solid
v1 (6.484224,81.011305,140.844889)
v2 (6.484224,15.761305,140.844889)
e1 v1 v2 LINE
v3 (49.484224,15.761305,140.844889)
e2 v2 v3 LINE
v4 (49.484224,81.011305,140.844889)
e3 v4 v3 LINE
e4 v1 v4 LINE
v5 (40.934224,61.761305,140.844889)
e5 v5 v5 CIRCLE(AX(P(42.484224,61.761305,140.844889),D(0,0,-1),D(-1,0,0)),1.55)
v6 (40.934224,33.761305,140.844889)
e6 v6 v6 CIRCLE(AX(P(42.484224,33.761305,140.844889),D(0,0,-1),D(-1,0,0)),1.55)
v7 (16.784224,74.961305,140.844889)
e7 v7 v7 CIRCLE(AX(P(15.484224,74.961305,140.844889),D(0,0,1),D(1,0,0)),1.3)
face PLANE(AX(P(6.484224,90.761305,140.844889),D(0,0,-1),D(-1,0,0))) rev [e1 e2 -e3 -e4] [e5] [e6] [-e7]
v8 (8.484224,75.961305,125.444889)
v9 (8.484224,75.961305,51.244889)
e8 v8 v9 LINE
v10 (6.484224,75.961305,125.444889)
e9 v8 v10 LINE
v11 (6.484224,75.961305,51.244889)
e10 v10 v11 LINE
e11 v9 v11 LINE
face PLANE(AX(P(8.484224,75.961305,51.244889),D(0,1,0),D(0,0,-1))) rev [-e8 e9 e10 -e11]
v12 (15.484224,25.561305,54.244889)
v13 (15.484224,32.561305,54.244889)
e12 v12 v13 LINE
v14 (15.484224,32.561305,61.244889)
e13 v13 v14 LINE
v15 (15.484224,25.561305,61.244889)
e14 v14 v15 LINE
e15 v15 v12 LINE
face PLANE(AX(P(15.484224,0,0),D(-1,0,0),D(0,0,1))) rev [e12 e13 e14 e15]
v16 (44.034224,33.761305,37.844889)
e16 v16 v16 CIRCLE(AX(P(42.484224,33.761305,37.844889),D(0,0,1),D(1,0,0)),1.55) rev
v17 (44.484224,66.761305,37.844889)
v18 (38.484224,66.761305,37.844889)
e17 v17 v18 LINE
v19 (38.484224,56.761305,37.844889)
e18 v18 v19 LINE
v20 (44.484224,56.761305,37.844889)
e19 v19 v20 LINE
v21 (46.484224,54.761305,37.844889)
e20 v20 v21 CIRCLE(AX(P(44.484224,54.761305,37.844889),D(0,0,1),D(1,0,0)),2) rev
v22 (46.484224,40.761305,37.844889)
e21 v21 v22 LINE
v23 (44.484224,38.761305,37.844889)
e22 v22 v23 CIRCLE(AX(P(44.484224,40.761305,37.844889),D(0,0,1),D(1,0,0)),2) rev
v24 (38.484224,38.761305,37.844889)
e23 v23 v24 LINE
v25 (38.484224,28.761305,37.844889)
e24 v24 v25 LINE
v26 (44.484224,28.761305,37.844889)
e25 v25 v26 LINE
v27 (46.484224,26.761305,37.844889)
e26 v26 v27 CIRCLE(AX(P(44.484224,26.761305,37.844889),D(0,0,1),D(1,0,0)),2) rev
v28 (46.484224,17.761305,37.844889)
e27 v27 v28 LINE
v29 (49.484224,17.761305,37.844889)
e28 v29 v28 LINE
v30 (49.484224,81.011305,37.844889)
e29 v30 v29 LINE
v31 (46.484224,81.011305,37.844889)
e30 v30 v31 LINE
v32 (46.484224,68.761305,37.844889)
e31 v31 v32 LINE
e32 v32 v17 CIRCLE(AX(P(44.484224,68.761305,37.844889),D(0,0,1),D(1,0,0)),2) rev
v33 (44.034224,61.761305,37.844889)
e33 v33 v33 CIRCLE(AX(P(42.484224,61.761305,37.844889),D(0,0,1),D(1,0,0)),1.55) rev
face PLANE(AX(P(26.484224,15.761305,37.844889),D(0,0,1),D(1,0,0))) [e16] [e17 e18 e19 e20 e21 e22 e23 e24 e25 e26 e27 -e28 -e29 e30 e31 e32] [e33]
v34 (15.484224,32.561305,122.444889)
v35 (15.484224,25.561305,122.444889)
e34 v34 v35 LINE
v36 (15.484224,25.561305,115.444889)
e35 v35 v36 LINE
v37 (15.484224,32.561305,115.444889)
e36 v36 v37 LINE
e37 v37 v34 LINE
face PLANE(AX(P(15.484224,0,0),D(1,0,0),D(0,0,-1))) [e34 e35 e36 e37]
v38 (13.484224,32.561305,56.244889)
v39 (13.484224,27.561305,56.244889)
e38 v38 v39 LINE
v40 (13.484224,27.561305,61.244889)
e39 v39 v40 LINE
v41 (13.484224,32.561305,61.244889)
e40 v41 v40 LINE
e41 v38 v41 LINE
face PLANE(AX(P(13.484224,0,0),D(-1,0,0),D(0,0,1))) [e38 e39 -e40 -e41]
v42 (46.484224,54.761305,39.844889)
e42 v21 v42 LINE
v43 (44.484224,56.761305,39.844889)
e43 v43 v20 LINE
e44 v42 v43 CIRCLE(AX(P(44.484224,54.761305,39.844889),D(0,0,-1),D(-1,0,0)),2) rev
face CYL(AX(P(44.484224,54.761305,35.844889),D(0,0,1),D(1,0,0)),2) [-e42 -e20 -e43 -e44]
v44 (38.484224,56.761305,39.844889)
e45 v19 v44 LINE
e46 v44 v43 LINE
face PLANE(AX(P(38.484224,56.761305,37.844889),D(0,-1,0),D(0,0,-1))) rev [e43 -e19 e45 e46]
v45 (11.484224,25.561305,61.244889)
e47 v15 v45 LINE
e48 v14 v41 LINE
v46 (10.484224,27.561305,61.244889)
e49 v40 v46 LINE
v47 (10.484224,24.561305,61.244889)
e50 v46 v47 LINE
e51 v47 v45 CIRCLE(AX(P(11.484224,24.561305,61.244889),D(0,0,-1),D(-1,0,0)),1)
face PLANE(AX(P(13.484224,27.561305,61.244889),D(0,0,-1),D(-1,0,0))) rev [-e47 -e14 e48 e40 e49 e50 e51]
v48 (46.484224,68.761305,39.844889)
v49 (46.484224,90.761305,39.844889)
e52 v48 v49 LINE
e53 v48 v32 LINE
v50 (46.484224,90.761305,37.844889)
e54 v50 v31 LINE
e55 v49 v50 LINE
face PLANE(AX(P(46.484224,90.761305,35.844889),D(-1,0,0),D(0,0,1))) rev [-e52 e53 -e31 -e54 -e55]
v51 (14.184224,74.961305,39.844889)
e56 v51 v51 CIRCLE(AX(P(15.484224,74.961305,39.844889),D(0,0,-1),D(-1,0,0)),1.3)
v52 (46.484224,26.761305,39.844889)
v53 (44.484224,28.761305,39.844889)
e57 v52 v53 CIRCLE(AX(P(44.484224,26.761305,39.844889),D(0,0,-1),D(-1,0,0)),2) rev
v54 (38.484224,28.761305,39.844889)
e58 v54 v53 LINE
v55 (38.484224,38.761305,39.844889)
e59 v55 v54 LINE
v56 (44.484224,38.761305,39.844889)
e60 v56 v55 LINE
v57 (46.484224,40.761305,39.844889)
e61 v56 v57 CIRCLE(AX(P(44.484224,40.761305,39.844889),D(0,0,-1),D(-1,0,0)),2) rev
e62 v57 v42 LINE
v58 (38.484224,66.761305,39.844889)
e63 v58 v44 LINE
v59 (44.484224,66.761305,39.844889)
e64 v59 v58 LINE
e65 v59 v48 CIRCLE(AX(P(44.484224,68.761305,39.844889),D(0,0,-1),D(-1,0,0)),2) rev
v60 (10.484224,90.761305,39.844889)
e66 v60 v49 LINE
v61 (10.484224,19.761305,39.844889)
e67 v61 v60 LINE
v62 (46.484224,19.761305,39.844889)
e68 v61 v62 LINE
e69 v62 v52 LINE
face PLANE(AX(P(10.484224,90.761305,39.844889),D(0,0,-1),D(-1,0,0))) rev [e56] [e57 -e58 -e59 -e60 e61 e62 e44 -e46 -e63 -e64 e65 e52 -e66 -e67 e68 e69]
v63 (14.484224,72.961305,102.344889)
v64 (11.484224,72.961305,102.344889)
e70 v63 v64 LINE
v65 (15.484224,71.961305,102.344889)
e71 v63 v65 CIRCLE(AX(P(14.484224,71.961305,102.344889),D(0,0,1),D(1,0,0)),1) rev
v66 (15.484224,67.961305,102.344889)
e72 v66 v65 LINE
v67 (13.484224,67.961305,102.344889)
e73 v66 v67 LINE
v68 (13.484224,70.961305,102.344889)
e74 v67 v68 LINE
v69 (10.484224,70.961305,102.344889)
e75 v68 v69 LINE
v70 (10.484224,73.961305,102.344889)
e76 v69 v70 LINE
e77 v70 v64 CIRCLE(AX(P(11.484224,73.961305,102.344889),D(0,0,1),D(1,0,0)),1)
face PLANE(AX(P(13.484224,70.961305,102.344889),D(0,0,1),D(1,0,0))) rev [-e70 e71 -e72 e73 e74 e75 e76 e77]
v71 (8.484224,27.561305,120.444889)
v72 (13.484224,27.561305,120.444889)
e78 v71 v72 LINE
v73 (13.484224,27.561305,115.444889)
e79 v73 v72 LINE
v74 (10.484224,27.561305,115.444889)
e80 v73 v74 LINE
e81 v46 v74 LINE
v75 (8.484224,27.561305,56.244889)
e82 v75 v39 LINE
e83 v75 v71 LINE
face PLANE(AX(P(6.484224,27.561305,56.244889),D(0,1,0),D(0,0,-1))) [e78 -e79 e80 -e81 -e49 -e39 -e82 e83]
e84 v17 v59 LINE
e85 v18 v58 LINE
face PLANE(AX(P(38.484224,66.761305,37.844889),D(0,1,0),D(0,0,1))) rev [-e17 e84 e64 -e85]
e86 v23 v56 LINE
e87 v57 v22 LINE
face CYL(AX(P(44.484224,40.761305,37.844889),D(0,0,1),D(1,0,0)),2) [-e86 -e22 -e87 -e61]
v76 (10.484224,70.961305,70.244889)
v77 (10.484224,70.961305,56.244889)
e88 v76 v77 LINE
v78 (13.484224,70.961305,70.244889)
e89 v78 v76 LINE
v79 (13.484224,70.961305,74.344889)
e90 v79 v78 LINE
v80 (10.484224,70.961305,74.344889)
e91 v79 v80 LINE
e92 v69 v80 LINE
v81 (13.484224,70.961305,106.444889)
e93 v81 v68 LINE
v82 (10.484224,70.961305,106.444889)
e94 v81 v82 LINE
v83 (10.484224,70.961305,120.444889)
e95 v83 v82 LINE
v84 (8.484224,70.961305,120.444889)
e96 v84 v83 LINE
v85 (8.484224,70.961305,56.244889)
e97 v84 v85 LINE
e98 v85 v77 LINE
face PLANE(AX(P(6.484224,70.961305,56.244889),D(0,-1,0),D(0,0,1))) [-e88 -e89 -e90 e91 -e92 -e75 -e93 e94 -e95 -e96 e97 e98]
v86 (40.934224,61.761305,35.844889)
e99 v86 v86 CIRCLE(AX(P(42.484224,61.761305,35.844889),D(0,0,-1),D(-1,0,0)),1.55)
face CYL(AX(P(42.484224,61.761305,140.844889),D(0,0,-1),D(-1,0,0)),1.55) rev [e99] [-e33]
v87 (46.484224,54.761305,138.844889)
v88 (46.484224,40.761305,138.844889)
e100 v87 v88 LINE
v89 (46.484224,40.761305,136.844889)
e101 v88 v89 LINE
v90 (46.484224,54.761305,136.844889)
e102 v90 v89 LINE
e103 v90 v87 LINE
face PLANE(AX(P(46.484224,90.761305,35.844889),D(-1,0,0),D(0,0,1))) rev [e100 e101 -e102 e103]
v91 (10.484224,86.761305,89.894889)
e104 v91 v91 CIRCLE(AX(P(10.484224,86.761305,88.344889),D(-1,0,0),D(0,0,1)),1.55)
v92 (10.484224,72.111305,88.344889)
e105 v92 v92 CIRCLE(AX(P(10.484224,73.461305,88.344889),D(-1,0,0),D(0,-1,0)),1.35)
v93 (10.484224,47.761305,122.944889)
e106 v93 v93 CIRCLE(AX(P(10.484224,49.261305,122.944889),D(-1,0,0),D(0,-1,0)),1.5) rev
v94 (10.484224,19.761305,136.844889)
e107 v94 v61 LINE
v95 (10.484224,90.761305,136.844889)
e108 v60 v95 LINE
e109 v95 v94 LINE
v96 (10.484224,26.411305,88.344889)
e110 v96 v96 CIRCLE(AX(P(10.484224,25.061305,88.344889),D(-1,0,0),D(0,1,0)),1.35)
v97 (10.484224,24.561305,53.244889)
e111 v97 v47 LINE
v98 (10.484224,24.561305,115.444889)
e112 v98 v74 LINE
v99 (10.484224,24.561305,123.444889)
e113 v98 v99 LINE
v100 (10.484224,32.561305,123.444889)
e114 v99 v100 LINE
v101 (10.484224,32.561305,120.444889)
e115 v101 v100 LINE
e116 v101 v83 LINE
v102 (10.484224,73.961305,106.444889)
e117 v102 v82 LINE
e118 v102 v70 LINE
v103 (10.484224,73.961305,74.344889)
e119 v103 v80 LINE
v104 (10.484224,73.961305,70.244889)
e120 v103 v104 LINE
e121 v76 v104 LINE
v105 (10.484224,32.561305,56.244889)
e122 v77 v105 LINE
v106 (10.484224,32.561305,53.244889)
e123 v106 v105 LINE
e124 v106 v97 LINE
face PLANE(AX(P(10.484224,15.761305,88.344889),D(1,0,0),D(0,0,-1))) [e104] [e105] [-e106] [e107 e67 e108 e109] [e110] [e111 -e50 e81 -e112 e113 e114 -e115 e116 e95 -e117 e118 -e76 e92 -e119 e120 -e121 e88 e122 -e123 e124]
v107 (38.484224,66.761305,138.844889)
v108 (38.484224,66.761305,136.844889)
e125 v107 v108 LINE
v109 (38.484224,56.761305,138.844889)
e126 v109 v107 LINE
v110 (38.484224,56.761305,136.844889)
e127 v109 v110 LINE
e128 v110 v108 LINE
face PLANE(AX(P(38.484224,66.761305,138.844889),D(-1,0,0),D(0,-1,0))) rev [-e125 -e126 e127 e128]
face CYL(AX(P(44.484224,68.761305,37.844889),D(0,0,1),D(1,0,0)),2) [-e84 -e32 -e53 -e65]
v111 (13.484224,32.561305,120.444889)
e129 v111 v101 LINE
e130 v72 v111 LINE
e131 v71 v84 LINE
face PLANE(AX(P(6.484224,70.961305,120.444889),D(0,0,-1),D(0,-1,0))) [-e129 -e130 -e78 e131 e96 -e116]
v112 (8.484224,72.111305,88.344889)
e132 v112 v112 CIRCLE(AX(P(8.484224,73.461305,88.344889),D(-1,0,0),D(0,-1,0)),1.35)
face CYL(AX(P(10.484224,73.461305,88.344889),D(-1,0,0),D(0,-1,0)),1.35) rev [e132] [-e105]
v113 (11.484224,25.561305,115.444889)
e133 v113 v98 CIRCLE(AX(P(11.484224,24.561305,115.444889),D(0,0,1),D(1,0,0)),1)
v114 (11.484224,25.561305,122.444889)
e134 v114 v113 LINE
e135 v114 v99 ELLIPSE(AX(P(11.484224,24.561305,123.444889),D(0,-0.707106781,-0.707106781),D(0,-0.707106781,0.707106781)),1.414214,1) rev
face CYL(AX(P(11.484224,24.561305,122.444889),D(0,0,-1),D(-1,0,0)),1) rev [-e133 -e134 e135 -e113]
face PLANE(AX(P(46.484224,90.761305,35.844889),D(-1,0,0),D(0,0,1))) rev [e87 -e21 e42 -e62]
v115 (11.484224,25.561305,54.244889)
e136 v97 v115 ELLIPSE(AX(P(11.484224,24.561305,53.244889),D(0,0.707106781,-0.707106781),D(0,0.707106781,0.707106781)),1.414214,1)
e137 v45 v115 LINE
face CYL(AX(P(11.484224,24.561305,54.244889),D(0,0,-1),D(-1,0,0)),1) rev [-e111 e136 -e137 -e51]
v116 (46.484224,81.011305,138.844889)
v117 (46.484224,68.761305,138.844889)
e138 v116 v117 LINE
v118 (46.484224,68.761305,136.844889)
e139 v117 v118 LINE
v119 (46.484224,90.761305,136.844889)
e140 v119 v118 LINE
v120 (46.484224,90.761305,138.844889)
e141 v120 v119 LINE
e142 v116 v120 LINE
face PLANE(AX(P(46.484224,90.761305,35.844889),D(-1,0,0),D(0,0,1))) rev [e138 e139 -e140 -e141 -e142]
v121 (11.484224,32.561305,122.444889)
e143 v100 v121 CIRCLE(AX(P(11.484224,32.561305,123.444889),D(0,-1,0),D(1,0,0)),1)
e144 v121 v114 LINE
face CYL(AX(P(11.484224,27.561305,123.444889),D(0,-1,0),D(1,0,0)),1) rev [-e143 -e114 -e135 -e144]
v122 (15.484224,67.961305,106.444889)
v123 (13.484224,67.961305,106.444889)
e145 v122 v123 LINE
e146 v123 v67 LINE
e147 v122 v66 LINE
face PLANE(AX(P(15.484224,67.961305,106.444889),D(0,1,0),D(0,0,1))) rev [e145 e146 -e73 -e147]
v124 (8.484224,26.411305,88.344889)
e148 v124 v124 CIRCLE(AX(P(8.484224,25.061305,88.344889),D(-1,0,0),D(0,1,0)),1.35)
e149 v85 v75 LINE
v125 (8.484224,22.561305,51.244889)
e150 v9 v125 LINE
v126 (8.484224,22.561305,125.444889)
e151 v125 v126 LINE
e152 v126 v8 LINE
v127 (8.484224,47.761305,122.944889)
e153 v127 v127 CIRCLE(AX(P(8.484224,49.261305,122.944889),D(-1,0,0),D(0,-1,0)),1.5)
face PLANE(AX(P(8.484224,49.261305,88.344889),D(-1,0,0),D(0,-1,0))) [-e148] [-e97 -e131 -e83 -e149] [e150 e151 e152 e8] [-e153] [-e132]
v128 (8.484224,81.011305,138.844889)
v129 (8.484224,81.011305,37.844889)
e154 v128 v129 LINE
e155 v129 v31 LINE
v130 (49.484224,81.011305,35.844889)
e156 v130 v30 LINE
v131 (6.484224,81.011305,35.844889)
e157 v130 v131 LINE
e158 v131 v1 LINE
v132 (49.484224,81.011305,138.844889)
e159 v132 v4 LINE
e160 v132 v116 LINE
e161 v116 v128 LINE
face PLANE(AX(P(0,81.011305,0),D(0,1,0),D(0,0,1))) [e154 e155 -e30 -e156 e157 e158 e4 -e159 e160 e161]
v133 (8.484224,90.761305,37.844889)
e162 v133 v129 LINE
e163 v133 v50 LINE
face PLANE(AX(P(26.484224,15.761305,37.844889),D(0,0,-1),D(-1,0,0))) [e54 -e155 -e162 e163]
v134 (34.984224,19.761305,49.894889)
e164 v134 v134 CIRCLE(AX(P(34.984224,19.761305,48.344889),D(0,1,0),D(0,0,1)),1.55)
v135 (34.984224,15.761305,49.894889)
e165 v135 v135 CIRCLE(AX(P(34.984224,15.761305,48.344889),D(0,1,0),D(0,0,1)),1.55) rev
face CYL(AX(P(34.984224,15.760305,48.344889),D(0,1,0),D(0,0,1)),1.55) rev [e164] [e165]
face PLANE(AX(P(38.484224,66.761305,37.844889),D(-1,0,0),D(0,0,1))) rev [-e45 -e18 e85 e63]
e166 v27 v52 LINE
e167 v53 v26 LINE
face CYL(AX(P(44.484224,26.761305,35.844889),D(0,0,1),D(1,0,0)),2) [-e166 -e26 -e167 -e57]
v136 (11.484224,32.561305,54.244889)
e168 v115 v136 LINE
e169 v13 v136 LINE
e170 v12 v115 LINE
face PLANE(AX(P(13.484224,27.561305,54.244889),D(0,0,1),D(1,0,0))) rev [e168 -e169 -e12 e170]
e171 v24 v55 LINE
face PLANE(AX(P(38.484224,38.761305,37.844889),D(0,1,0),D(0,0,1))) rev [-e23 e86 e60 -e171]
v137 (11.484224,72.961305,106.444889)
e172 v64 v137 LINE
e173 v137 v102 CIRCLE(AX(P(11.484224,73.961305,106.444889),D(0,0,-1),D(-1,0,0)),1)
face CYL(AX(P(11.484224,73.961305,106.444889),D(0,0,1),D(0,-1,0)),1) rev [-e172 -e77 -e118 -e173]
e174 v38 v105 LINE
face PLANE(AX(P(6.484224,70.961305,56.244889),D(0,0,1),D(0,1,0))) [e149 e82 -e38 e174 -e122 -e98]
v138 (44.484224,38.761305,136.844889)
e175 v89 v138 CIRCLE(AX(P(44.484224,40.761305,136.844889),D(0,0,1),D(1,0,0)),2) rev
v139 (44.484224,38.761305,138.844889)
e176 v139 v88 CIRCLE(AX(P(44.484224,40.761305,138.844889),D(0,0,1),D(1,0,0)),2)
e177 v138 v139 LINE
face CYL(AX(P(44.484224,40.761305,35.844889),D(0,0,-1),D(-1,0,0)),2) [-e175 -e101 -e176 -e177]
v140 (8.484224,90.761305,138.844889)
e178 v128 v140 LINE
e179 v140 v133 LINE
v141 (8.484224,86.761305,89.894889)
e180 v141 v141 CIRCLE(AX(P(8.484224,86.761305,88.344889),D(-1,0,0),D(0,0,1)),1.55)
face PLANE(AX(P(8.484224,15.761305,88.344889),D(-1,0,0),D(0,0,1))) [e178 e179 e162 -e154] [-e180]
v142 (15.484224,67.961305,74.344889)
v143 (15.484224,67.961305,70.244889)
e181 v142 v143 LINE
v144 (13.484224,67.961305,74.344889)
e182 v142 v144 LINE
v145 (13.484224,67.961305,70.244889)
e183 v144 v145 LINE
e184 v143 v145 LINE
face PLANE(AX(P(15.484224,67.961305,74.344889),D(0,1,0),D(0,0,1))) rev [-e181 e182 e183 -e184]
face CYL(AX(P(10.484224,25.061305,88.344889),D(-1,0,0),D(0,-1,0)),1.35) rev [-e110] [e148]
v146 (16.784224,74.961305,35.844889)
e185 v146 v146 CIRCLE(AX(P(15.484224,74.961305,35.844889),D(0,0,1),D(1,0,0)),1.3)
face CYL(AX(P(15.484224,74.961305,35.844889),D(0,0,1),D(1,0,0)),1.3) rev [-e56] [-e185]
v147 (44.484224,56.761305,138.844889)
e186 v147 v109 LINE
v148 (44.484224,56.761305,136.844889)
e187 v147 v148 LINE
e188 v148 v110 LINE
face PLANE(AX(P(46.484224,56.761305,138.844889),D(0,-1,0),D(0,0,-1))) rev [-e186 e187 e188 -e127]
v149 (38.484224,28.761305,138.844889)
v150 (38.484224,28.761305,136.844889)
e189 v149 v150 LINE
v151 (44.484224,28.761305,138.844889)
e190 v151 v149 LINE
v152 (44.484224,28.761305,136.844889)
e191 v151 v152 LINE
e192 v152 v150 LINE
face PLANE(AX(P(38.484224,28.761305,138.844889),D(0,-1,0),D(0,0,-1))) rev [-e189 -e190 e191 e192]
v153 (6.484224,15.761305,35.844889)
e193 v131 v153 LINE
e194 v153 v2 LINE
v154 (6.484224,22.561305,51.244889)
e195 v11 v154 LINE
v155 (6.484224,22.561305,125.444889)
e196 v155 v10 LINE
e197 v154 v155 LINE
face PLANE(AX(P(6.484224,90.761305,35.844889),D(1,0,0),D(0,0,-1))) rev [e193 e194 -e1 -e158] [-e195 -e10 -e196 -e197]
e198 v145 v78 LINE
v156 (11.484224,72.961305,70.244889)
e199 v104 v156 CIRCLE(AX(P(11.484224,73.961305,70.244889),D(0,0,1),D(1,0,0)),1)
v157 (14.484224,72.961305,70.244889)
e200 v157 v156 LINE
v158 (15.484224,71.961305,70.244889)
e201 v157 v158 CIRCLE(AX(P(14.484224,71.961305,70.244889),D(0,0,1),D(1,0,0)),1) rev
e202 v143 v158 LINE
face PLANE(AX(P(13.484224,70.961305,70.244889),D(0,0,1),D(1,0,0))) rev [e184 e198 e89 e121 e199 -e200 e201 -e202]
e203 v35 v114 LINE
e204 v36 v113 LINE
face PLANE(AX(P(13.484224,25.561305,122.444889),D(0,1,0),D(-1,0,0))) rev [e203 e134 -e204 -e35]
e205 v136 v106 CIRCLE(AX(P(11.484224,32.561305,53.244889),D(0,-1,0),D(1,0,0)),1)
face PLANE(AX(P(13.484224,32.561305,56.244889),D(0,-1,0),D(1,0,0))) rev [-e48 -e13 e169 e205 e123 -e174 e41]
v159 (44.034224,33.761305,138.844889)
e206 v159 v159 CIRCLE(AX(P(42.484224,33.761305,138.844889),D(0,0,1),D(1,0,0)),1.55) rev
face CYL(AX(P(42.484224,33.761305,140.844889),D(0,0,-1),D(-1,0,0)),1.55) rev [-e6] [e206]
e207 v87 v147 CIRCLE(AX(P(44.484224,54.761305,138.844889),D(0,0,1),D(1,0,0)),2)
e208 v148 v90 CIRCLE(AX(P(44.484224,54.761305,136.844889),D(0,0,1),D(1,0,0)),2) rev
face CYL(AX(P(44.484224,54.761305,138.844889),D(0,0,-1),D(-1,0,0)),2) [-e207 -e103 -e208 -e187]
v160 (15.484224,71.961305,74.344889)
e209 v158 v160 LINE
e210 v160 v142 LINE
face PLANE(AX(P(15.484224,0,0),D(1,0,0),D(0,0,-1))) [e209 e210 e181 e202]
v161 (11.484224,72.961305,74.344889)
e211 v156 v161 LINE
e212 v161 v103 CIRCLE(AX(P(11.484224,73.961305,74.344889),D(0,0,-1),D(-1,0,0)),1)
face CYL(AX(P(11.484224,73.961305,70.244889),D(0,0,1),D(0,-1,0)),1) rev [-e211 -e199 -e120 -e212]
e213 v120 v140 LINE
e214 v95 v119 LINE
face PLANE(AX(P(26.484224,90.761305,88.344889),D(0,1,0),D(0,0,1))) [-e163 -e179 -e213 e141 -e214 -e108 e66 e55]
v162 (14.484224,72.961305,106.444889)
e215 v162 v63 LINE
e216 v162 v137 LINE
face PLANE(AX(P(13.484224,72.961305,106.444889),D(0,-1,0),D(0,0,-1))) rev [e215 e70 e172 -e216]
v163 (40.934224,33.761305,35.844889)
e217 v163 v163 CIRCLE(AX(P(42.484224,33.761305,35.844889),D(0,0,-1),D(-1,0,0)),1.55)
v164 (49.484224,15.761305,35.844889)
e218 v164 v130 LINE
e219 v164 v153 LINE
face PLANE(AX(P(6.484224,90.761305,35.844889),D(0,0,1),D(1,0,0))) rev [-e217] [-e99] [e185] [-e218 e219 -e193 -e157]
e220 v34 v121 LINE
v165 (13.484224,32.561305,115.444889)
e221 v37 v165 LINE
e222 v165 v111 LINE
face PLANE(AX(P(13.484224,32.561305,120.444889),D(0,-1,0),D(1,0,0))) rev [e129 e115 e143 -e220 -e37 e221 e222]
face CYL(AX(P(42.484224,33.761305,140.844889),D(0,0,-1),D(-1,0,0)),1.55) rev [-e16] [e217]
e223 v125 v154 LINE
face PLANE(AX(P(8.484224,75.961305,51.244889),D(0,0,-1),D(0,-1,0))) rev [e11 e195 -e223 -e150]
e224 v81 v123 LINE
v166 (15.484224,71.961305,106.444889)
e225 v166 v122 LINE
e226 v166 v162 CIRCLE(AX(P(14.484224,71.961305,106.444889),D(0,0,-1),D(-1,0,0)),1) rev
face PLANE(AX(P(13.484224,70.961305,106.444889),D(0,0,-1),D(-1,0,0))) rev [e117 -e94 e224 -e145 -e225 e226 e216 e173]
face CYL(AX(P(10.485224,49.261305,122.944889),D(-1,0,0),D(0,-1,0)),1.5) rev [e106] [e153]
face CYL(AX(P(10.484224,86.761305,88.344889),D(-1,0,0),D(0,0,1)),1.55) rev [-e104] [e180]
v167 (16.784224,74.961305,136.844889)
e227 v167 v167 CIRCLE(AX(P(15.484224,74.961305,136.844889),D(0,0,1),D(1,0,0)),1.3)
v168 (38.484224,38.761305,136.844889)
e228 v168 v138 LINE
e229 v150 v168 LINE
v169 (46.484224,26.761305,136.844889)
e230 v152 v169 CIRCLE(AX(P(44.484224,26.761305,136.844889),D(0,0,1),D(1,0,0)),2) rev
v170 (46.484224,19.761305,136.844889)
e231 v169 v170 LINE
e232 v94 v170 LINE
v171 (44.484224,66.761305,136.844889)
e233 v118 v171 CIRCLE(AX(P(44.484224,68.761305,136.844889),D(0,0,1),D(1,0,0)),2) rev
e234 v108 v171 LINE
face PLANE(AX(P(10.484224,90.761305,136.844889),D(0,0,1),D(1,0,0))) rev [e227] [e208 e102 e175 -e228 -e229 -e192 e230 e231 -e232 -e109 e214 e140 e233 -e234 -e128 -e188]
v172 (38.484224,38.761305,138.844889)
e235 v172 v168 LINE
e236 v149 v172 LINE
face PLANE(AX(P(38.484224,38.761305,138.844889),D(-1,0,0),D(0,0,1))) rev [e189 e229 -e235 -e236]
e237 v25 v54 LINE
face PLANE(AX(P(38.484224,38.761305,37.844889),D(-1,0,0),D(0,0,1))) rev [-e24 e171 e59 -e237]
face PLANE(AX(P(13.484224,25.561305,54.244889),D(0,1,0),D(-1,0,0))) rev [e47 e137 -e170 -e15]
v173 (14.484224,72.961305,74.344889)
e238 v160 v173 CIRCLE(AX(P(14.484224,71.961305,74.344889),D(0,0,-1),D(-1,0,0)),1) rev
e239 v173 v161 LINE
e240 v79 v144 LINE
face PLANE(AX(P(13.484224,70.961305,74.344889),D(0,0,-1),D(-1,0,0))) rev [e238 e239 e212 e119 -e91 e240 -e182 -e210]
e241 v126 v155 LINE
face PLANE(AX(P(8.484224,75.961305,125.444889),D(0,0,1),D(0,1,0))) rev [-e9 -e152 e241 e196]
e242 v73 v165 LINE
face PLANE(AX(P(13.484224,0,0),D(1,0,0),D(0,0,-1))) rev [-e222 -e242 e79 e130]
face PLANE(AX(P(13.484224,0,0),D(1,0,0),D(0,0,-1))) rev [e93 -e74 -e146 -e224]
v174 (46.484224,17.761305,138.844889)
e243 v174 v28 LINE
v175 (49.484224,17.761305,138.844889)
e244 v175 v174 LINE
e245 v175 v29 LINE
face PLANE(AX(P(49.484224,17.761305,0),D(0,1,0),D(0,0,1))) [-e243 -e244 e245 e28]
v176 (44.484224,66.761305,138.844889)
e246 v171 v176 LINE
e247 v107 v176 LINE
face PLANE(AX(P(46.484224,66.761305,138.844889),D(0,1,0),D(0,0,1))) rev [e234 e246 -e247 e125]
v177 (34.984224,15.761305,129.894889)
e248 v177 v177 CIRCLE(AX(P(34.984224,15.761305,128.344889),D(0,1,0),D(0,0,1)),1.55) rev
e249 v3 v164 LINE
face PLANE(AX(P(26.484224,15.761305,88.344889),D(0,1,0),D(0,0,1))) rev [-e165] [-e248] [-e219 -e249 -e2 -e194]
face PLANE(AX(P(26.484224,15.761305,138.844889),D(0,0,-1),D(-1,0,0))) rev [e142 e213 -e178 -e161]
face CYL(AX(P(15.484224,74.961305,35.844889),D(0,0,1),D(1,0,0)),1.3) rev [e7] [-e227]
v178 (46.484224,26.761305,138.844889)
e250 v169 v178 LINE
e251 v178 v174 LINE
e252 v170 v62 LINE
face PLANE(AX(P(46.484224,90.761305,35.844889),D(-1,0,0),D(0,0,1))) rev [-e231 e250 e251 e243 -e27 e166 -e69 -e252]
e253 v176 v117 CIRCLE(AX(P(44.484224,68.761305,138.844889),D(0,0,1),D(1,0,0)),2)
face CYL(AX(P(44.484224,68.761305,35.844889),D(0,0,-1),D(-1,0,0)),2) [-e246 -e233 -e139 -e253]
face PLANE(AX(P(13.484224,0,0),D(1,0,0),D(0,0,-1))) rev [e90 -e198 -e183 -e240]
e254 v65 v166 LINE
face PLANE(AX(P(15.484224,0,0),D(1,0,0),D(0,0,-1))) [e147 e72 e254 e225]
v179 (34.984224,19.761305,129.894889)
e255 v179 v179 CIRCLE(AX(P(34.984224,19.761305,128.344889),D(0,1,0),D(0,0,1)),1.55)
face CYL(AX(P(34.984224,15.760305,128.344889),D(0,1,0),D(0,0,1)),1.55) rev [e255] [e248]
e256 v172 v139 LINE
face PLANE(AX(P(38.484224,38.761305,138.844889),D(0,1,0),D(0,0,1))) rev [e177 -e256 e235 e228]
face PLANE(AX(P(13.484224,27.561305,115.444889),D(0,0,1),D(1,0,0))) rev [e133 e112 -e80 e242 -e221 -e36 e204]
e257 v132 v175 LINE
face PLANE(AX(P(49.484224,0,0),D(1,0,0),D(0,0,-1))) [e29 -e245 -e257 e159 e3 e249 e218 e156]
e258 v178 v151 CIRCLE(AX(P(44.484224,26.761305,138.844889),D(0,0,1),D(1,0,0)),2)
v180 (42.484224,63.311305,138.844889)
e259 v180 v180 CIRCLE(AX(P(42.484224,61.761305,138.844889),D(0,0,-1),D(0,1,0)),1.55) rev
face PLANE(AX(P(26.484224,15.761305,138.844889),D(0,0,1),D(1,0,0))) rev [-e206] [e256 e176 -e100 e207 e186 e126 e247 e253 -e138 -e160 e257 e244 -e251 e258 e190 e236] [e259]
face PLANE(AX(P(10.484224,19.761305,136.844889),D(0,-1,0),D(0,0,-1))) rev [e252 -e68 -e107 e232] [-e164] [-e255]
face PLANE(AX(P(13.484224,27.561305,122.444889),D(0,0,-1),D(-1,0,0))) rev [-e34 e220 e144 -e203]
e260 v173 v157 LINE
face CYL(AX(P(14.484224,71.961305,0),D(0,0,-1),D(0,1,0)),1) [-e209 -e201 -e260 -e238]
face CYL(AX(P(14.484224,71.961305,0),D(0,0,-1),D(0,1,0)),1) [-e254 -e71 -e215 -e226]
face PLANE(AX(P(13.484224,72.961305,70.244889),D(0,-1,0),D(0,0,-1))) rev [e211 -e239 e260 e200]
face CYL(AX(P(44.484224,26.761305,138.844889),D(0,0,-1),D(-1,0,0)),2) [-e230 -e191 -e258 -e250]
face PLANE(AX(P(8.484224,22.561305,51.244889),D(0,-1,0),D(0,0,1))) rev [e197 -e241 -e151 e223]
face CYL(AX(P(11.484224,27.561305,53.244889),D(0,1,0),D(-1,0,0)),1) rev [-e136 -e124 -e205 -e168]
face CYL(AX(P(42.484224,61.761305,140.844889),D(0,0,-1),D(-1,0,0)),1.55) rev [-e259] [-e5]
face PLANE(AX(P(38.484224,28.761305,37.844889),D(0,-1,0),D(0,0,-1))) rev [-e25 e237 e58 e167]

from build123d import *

# Parameters (mm, degrees)
COMBINE1_START         = 6.4842237
COMBINE1_DEPTH         = 32
COMBINE1_START_2       = 8.4842237
COMBINE1_2_OUTLINE_R   = 1.55
COMBINE1_2_OUTLINE_R_2 = 1.35
COMBINE1_2_OUTLINE_W   = 43.4
COMBINE1_2_OUTLINE_H   = 64.2
COMBINE1_2_OUTLINE_R_3 = 1.5
COMBINE1_2_DEPTH       = 2
COMBINE1_3_OUTLINE_W   = 61.2
COMBINE1_3_OUTLINE_H   = 97
COMBINE1_3_OUTLINE_W_2 = 53.4
COMBINE1_3_OUTLINE_H_2 = 74.2
COMBINE1_3_DEPTH       = 2
COMBINE1_START_3       = 10.4842237
COMBINE1_4_DEPTH       = 30.4499999
COMBINE1_START_4       = 44.0342238
COMBINE1_5_DEPTH       = 2.4499999
COMBINE1_START_5       = 38.4842237
COMBINE1_6_OUTLINE_W   = 9.8
COMBINE1_6_OUTLINE_H   = 2
COMBINE1_6_DEPTH       = 8
COMBINE1_START_6       = 35.844889136
COMBINE1_7_OUTLINE_W   = 3.1000002
COMBINE1_7_OUTLINE_H   = 4
COMBINE1_7_DEPTH       = 105
COMBINE1_8_OUTLINE_W   = 3.1000002
COMBINE1_8_OUTLINE_H   = 18
COMBINE1_8_OUTLINE_H_2 = 14.2
COMBINE1_8_OUTLINE_H_3 = 9
COMBINE1_8_DEPTH       = 4
COMBINE1_START_7       = 136.844889136
COMBINE1_9_OUTLINE_W   = 3.1000002
COMBINE1_9_OUTLINE_H   = 18
COMBINE1_9_OUTLINE_H_2 = 14.2
COMBINE1_9_OUTLINE_H_3 = 9
COMBINE1_9_DEPTH       = 4
COMBINE1_10_DEPTH      = 2
COMBINE1_START_8       = 138.844889136
COMBINE1_11_DEPTH      = 2
BOSS_EXTRUDE1_DEPTH    = 3
SKETCH2_W              = 7
SKETCH2_H              = 7
BOSS_EXTRUDE2_DEPTH    = 2
SKETCH3_W              = 4.1
SKETCH3_H              = 2
BOSS_EXTRUDE3_DEPTH    = 3
SKETCH4_W              = 4.1
SKETCH4_H              = 5
BOSS_EXTRUDE4_DEPTH    = 2
CUT_EXTRUDE2_REACH     = 166.436
SKETCH5_R              = 1.55
SKETCH6_R              = 1.3
CUT_EXTRUDE3_DEPTH     = 147.367337693
BOSS_EXTRUDE5_DEPTH    = 0.05
SKETCH8_W              = 101
SKETCH8_H              = 2
BOSS_EXTRUDE6_DEPTH    = 3
FILLET1_R              = 2
FILLET2_R              = 1


with BuildPart() as part:
    # Combine1: read off the stored shape, not the designer's step
    # Combine1 outline → Combine1 (new body)
    with BuildSketch(Plane.YZ.offset(COMBINE1_START)):
        Polygon((80.961305028, 35.844889136), (80.961305028, 39.844889136), (19.761305028, 39.844889136), (19.761305028, 136.844889136), (80.961305028, 136.844889136), (80.961305028, 140.844889136), (15.761305028, 140.844889136), (15.761305028, 35.844889136), align=None)
    extrude(amount=COMBINE1_DEPTH)

    # Combine1 2 outline → Combine1 2 (add)
    with BuildSketch(Plane.YZ.offset(COMBINE1_START_2)):
        Polygon((80.961305028, 37.844889136), (90.761305028, 37.844889136), (90.761305028, 138.844889136), (80.961305028, 138.844889136), (80.961305028, 136.844889136), (19.761305028, 136.844889136), (19.761305028, 39.844889136), (80.961305028, 39.844889136), align=None)
        with Locations((86.761305028, 88.344889136)):
            Circle(COMBINE1_2_OUTLINE_R, mode=Mode.SUBTRACT)
        with Locations((73.461305028, 88.344889136)):
            Circle(COMBINE1_2_OUTLINE_R_2, mode=Mode.SUBTRACT)
        with Locations((49.261305028, 88.344889136)):
            Rectangle(COMBINE1_2_OUTLINE_W, COMBINE1_2_OUTLINE_H, mode=Mode.SUBTRACT)
        with Locations((49.261305028, 122.944889136)):
            Circle(COMBINE1_2_OUTLINE_R_3, mode=Mode.SUBTRACT)
        with Locations((25.061305028, 88.344889136)):
            Circle(COMBINE1_2_OUTLINE_R_2, mode=Mode.SUBTRACT)
    extrude(amount=COMBINE1_2_DEPTH)

    # Combine1 3 outline → Combine1 3 (add)
    with BuildSketch(Plane.YZ.offset(COMBINE1_START)):
        with Locations((50.361305028, 88.344889136)):
            Rectangle(COMBINE1_3_OUTLINE_W, COMBINE1_3_OUTLINE_H)
        with Locations((49.261305028, 88.344889136)):
            Rectangle(COMBINE1_3_OUTLINE_W_2, COMBINE1_3_OUTLINE_H_2, mode=Mode.SUBTRACT)
    extrude(amount=COMBINE1_3_DEPTH)

    # Combine1 4 outline → Combine1 4 (add)
    with BuildSketch(Plane.YZ.offset(COMBINE1_START_3)):
        Polygon((80.961305028, 37.844889136), (90.761305028, 37.844889136), (90.761305028, 39.844889136), (66.761305028, 39.844889136), (66.761305028, 37.844889136), (56.761305028, 37.844889136), (56.761305028, 39.844889136), (38.761305028, 39.844889136), (38.761305028, 37.844889136), (28.761305028, 37.844889136), (28.761305028, 39.844889136), (19.761305028, 39.844889136), (19.761305028, 136.844889136), (28.761305028, 136.844889136), (28.761305028, 138.844889136), (38.761305028, 138.844889136), (38.761305028, 136.844889136), (56.761305028, 136.844889136), (56.761305028, 138.844889136), (66.761305028, 138.844889136), (66.761305028, 136.844889136), (90.761305028, 136.844889136), (90.761305028, 138.844889136), (80.961305028, 138.844889136), (80.961305028, 140.844889136), (15.761305028, 140.844889136), (15.761305028, 35.844889136), (80.961305028, 35.844889136), align=None)
    extrude(amount=COMBINE1_4_DEPTH)



with BuildPart() as body_2:
    # Combine1 5 outline → Combine1 5 (new body)
    with BuildSketch(Plane.YZ.offset(COMBINE1_START_4)):
        Polygon((80.961305028, 37.844889136), (90.761305028, 37.844889136), (90.761305028, 39.844889136), (66.761305028, 39.844889136), (66.761305028, 37.844889136), (56.761305028, 37.844889136), (56.761305028, 39.844889136), (38.761305028, 39.844889136), (38.761305028, 37.844889136), (28.761305028, 37.844889136), (28.761305028, 39.844889136), (19.761305028, 39.844889136), (19.761305028, 136.844889136), (28.761305028, 136.844889136), (28.761305028, 138.844889136), (38.761305028, 138.844889136), (38.761305028, 136.844889136), (56.761305028, 136.844889136), (56.761305028, 138.844889136), (66.761305028, 138.844889136), (66.761305028, 136.844889136), (90.761305028, 136.844889136), (90.761305028, 138.844889136), (80.961305028, 138.844889136), (80.961305028, 140.844889136), (15.761305028, 140.844889136), (15.761305028, 35.844889136), (80.961305028, 35.844889136), align=None)
    extrude(amount=COMBINE1_5_DEPTH)


with BuildPart() as part_1:
    add(part.part)

    add(body_2.part)  # Combine1 6 merges body 2
    # Combine1 6 outline → Combine1 6 (add)
    with BuildSketch(Plane.YZ.offset(COMBINE1_START_5)):
        with Locations((85.861305028, 38.844889136)):
            Rectangle(COMBINE1_6_OUTLINE_W, COMBINE1_6_OUTLINE_H)
        with Locations((85.861305028, 137.844889136)):
            Rectangle(COMBINE1_6_OUTLINE_W, COMBINE1_6_OUTLINE_H)
    extrude(amount=COMBINE1_6_DEPTH)

    # Combine1 7 outline → Combine1 7 (add)
    with BuildSketch(Plane.XY.offset(COMBINE1_START_6)):
        with Locations((42.4842237, 17.761305028)):
            Rectangle(COMBINE1_7_OUTLINE_W, COMBINE1_7_OUTLINE_H)
    extrude(amount=COMBINE1_7_DEPTH)

    # Combine1 8 outline → Combine1 8 (add)
    with BuildSketch(Plane.XY.offset(COMBINE1_START_6)):
        with Locations((42.4842237, 47.761305028)):
            Rectangle(COMBINE1_8_OUTLINE_W, COMBINE1_8_OUTLINE_H)
        with Locations((42.4842237, 73.861305028)):
            Rectangle(COMBINE1_8_OUTLINE_W, COMBINE1_8_OUTLINE_H_2)
        with Locations((42.4842237, 24.261305028)):
            Rectangle(COMBINE1_8_OUTLINE_W, COMBINE1_8_OUTLINE_H_3)
    extrude(amount=COMBINE1_8_DEPTH)

    # Combine1 9 outline → Combine1 9 (add)
    with BuildSketch(Plane.XY.offset(COMBINE1_START_7)):
        with Locations((42.4842237, 47.761305028)):
            Rectangle(COMBINE1_9_OUTLINE_W, COMBINE1_9_OUTLINE_H)
        with Locations((42.4842237, 73.861305028)):
            Rectangle(COMBINE1_9_OUTLINE_W, COMBINE1_9_OUTLINE_H_2)
        with Locations((42.4842237, 24.261305028)):
            Rectangle(COMBINE1_9_OUTLINE_W, COMBINE1_9_OUTLINE_H_3)
    extrude(amount=COMBINE1_9_DEPTH)

    # Combine1 10 outline → Combine1 10 (add)
    with BuildSketch(Plane.XY.offset(COMBINE1_START_6)):
        with BuildLine():
            Line((44.0342238, 56.761305028), (44.0342237, 61.761305028))
            ThreePointArc((44.0342237, 61.761305028), (42.4842237, 60.211305028), (40.9342237, 61.761305028))
            Line((40.9342237, 61.761305028), (40.9342236, 56.761305028))
            Line((40.9342236, 56.761305028), (44.0342238, 56.761305028))
        make_face()
        with BuildLine():
            ThreePointArc((40.9342237, 61.761305028), (42.4842237, 63.311305028), (44.0342237, 61.761305028))
            Line((44.0342237, 61.761305028), (44.0342238, 66.761305028))
            Line((44.0342238, 66.761305028), (40.9342236, 66.761305028))
            Line((40.9342236, 66.761305028), (40.9342237, 61.761305028))
        make_face()
        with BuildLine():
            Line((44.0342237, 33.761305028), (44.0342238, 38.761305028))
            Line((44.0342238, 38.761305028), (40.9342236, 38.761305028))
            Line((40.9342236, 38.761305028), (40.9342237, 33.761305028))
            ThreePointArc((40.9342237, 33.761305028), (42.4842237, 35.311305028), (44.0342237, 33.761305028))
        make_face()
        with BuildLine():
            Line((44.0342238, 28.761305028), (44.0342237, 33.761305028))
            ThreePointArc((44.0342237, 33.761305028), (42.4842237, 32.211305028), (40.9342237, 33.761305028))
            Line((40.9342237, 33.761305028), (40.9342236, 28.761305028))
            Line((40.9342236, 28.761305028), (44.0342238, 28.761305028))
        make_face()
    extrude(amount=COMBINE1_10_DEPTH)

    # Combine1 11 outline → Combine1 11 (add)
    with BuildSketch(Plane.XY.offset(COMBINE1_START_8)):
        with BuildLine():
            Line((44.0342238, 56.761305028), (44.0342237, 61.761305028))
            ThreePointArc((44.0342237, 61.761305028), (42.4842237, 60.211305028), (40.9342237, 61.761305028))
            Line((40.9342237, 61.761305028), (40.9342236, 56.761305028))
            Line((40.9342236, 56.761305028), (44.0342238, 56.761305028))
        make_face()
        with BuildLine():
            ThreePointArc((40.9342237, 61.761305028), (42.4842237, 63.311305028), (44.0342237, 61.761305028))
            Line((44.0342237, 61.761305028), (44.0342238, 66.761305028))
            Line((44.0342238, 66.761305028), (40.9342236, 66.761305028))
            Line((40.9342236, 66.761305028), (40.9342237, 61.761305028))
        make_face()
        with BuildLine():
            Line((44.0342237, 33.761305028), (44.0342238, 38.761305028))
            Line((44.0342238, 38.761305028), (40.9342236, 38.761305028))
            Line((40.9342236, 38.761305028), (40.9342237, 33.761305028))
            ThreePointArc((40.9342237, 33.761305028), (42.4842237, 35.311305028), (44.0342237, 33.761305028))
        make_face()
        with BuildLine():
            Line((44.0342238, 28.761305028), (44.0342237, 33.761305028))
            ThreePointArc((44.0342237, 33.761305028), (42.4842237, 32.211305028), (40.9342237, 33.761305028))
            Line((40.9342237, 33.761305028), (40.9342236, 28.761305028))
            Line((40.9342236, 28.761305028), (44.0342238, 28.761305028))
        make_face()
    extrude(amount=COMBINE1_11_DEPTH)

    # Sketch1 → Boss-Extrude1 (add)
    with BuildSketch(Plane(origin=(10.4842237, 0, 0), x_dir=(0, 0, -1), z_dir=(1, 0, 0))):
        Polygon((-120.444889136, 27.561305028), (-120.444889136, 32.561305028), (-122.444889136, 32.561305028), (-122.444889136, 27.561305028), (-122.444889136, 25.561305028), (-115.444889136, 25.561305028), (-115.444889136, 27.561305028), align=None)
        Polygon((-56.244889136, 27.561305028), (-61.244889136, 27.561305028), (-61.244889136, 25.561305028), (-54.244889136, 25.561305028), (-54.244889136, 27.561305028), (-54.244889136, 32.561305028), (-56.244889136, 32.561305028), align=None)
    extrude(amount=BOSS_EXTRUDE1_DEPTH)

    # Sketch2 → Boss-Extrude2 (add)
    with BuildSketch(Plane(origin=(13.4842237, 0, 0), x_dir=(0, 0, -1), z_dir=(1, 0, 0))):
        with Locations((-118.944889136, 29.061305028)):
            Rectangle(SKETCH2_W, SKETCH2_H)
        with Locations((-57.744889136, 29.061305028)):
            Rectangle(SKETCH2_W, SKETCH2_H)
    extrude(amount=BOSS_EXTRUDE2_DEPTH)

    # Sketch3 → Boss-Extrude3 (add)
    with BuildSketch(Plane(origin=(10.4842237, 0, 0), x_dir=(0, 0, -1), z_dir=(1, 0, 0))):
        with Locations((-104.394889136, 71.961305028)):
            Rectangle(SKETCH3_W, SKETCH3_H)
        with Locations((-72.294889136, 71.961305028)):
            Rectangle(SKETCH3_W, SKETCH3_H)
    extrude(amount=BOSS_EXTRUDE3_DEPTH)

    # Sketch4 → Boss-Extrude4 (add)
    with BuildSketch(Plane(origin=(13.4842237, 0, 0), x_dir=(0, 0, -1), z_dir=(1, 0, 0))):
        with Locations((-104.394889136, 70.461305028)):
            Rectangle(SKETCH4_W, SKETCH4_H)
        with Locations((-72.294889136, 70.461305028)):
            Rectangle(SKETCH4_W, SKETCH4_H)
    extrude(amount=BOSS_EXTRUDE4_DEPTH)

    # Sketch5 → Cut-Extrude2 (cut, up to next)
    with BuildSketch(Plane(origin=(0, 19.761305028, 0), x_dir=(1, 0, 0), z_dir=(0, 1, 0)), mode=Mode.PRIVATE) as cut_extrude2_sk1:
        with Locations(Location((34.9842237, -48.344889136, 0), (0, 0, 270))):
            Circle(SKETCH5_R)
    cut_extrude2_tool1 = extrude(cut_extrude2_sk1.sketch, amount=-CUT_EXTRUDE2_REACH, mode=Mode.PRIVATE) & part_1.part
    # Sketch5 → Cut-Extrude2 (cut, up to next)
    with BuildSketch(Plane(origin=(0, 19.761305028, 0), x_dir=(1, 0, 0), z_dir=(0, 1, 0)), mode=Mode.PRIVATE) as cut_extrude2_sk2:
        with Locations(Location((34.9842237, -128.344889136, 0), (0, 0, 270))):
            Circle(SKETCH5_R)
    cut_extrude2_tool2 = extrude(cut_extrude2_sk2.sketch, amount=-CUT_EXTRUDE2_REACH, mode=Mode.PRIVATE) & part_1.part
    add(cut_extrude2_tool1.solids().sort_by_distance((34.984224, 19.761305, 48.344889))[0], mode=Mode.SUBTRACT)
    add(cut_extrude2_tool2.solids().sort_by_distance((34.984224, 19.761305, 128.344889))[0], mode=Mode.SUBTRACT)

    # Sketch6 → Cut-Extrude3 (cut, through all)
    with BuildSketch(Plane.XY.offset(140.844889136)):
        with Locations((15.4842237, 74.961305028)):
            Circle(SKETCH6_R)
    extrude(amount=-CUT_EXTRUDE3_DEPTH, mode=Mode.SUBTRACT)

    # Sketch7 → Boss-Extrude5 (add)
    with BuildSketch(Plane(origin=(0, 80.961305028, 0), x_dir=(1, 0, 0), z_dir=(0, 1, 0))):
        Polygon((46.4842237, -37.844889136), (8.4842237, -37.844889136), (8.4842237, -138.844889136), (46.4842237, -138.844889136), (46.4842237, -140.844889136), (6.4842237, -140.844889136), (6.4842237, -138.844889136), (6.4842237, -37.844889136), (6.4842237, -35.844889136), (46.4842237, -35.844889136), align=None)
    extrude(amount=BOSS_EXTRUDE5_DEPTH)

    # Sketch8 → Boss-Extrude6 (add)
    with BuildSketch(Plane(origin=(46.4842237, 0, 0), x_dir=(0, 0, -1), z_dir=(1, 0, 0))):
        with Locations((-88.344889136, 16.761305028)):
            Rectangle(SKETCH8_W, SKETCH8_H)
        Polygon((-138.844889136, 66.761305028), (-138.844889136, 81.011305028), (-140.844889136, 81.011305028), (-140.844889136, 15.761305028), (-138.844889136, 15.761305028), (-138.844889136, 17.761305028), (-138.844889136, 28.761305028), (-138.844889136, 38.761305028), (-138.844889136, 56.761305028), align=None)
        Polygon((-37.844889136, 17.761305028), (-37.844889136, 15.761305028), (-35.844889136, 15.761305028), (-35.844889136, 81.011305028), (-37.844889136, 81.011305028), (-37.844889136, 66.761305028), (-37.844889136, 56.761305028), (-37.844889136, 38.761305028), (-37.844889136, 28.761305028), align=None)
    extrude(amount=BOSS_EXTRUDE6_DEPTH)

    # Fillet1
    fillet1_edges = [part_1.edges().sort_by_distance(p)[0] for p in [
        (46.4842237, 56.761305028, 137.844889136),
        (46.4842237, 66.761305028, 137.844889136),
        (46.4842237, 66.761305028, 38.844889136),
        (46.4842237, 56.761305028, 38.844889136),
        (46.4842237, 38.761305028, 38.844889136),
        (46.4842237, 28.761305028, 38.844889136),
        (46.4842237, 28.761305028, 137.844889136),
        (46.4842237, 38.761305028, 137.844889136),
    ]]
    fillet(fillet1_edges, radius=FILLET1_R)

    # Fillet2
    fillet2_edges = [part_1.edges().sort_by_distance(p)[0] for p in [
        (10.4842237, 29.061305028, 122.444889136),
        (10.4842237, 25.561305028, 118.944889136),
        (10.4842237, 25.561305028, 57.744889136),
        (10.4842237, 29.061305028, 54.244889136),
        (10.4842237, 72.961305028, 104.394889136),
        (10.4842237, 72.961305028, 72.294889136),
        (15.4842237, 72.961305028, 104.394889136),
        (15.4842237, 72.961305028, 72.294889136),
    ]]
    fillet(fillet2_edges, radius=FILLET2_R)


solid = part_1.part
